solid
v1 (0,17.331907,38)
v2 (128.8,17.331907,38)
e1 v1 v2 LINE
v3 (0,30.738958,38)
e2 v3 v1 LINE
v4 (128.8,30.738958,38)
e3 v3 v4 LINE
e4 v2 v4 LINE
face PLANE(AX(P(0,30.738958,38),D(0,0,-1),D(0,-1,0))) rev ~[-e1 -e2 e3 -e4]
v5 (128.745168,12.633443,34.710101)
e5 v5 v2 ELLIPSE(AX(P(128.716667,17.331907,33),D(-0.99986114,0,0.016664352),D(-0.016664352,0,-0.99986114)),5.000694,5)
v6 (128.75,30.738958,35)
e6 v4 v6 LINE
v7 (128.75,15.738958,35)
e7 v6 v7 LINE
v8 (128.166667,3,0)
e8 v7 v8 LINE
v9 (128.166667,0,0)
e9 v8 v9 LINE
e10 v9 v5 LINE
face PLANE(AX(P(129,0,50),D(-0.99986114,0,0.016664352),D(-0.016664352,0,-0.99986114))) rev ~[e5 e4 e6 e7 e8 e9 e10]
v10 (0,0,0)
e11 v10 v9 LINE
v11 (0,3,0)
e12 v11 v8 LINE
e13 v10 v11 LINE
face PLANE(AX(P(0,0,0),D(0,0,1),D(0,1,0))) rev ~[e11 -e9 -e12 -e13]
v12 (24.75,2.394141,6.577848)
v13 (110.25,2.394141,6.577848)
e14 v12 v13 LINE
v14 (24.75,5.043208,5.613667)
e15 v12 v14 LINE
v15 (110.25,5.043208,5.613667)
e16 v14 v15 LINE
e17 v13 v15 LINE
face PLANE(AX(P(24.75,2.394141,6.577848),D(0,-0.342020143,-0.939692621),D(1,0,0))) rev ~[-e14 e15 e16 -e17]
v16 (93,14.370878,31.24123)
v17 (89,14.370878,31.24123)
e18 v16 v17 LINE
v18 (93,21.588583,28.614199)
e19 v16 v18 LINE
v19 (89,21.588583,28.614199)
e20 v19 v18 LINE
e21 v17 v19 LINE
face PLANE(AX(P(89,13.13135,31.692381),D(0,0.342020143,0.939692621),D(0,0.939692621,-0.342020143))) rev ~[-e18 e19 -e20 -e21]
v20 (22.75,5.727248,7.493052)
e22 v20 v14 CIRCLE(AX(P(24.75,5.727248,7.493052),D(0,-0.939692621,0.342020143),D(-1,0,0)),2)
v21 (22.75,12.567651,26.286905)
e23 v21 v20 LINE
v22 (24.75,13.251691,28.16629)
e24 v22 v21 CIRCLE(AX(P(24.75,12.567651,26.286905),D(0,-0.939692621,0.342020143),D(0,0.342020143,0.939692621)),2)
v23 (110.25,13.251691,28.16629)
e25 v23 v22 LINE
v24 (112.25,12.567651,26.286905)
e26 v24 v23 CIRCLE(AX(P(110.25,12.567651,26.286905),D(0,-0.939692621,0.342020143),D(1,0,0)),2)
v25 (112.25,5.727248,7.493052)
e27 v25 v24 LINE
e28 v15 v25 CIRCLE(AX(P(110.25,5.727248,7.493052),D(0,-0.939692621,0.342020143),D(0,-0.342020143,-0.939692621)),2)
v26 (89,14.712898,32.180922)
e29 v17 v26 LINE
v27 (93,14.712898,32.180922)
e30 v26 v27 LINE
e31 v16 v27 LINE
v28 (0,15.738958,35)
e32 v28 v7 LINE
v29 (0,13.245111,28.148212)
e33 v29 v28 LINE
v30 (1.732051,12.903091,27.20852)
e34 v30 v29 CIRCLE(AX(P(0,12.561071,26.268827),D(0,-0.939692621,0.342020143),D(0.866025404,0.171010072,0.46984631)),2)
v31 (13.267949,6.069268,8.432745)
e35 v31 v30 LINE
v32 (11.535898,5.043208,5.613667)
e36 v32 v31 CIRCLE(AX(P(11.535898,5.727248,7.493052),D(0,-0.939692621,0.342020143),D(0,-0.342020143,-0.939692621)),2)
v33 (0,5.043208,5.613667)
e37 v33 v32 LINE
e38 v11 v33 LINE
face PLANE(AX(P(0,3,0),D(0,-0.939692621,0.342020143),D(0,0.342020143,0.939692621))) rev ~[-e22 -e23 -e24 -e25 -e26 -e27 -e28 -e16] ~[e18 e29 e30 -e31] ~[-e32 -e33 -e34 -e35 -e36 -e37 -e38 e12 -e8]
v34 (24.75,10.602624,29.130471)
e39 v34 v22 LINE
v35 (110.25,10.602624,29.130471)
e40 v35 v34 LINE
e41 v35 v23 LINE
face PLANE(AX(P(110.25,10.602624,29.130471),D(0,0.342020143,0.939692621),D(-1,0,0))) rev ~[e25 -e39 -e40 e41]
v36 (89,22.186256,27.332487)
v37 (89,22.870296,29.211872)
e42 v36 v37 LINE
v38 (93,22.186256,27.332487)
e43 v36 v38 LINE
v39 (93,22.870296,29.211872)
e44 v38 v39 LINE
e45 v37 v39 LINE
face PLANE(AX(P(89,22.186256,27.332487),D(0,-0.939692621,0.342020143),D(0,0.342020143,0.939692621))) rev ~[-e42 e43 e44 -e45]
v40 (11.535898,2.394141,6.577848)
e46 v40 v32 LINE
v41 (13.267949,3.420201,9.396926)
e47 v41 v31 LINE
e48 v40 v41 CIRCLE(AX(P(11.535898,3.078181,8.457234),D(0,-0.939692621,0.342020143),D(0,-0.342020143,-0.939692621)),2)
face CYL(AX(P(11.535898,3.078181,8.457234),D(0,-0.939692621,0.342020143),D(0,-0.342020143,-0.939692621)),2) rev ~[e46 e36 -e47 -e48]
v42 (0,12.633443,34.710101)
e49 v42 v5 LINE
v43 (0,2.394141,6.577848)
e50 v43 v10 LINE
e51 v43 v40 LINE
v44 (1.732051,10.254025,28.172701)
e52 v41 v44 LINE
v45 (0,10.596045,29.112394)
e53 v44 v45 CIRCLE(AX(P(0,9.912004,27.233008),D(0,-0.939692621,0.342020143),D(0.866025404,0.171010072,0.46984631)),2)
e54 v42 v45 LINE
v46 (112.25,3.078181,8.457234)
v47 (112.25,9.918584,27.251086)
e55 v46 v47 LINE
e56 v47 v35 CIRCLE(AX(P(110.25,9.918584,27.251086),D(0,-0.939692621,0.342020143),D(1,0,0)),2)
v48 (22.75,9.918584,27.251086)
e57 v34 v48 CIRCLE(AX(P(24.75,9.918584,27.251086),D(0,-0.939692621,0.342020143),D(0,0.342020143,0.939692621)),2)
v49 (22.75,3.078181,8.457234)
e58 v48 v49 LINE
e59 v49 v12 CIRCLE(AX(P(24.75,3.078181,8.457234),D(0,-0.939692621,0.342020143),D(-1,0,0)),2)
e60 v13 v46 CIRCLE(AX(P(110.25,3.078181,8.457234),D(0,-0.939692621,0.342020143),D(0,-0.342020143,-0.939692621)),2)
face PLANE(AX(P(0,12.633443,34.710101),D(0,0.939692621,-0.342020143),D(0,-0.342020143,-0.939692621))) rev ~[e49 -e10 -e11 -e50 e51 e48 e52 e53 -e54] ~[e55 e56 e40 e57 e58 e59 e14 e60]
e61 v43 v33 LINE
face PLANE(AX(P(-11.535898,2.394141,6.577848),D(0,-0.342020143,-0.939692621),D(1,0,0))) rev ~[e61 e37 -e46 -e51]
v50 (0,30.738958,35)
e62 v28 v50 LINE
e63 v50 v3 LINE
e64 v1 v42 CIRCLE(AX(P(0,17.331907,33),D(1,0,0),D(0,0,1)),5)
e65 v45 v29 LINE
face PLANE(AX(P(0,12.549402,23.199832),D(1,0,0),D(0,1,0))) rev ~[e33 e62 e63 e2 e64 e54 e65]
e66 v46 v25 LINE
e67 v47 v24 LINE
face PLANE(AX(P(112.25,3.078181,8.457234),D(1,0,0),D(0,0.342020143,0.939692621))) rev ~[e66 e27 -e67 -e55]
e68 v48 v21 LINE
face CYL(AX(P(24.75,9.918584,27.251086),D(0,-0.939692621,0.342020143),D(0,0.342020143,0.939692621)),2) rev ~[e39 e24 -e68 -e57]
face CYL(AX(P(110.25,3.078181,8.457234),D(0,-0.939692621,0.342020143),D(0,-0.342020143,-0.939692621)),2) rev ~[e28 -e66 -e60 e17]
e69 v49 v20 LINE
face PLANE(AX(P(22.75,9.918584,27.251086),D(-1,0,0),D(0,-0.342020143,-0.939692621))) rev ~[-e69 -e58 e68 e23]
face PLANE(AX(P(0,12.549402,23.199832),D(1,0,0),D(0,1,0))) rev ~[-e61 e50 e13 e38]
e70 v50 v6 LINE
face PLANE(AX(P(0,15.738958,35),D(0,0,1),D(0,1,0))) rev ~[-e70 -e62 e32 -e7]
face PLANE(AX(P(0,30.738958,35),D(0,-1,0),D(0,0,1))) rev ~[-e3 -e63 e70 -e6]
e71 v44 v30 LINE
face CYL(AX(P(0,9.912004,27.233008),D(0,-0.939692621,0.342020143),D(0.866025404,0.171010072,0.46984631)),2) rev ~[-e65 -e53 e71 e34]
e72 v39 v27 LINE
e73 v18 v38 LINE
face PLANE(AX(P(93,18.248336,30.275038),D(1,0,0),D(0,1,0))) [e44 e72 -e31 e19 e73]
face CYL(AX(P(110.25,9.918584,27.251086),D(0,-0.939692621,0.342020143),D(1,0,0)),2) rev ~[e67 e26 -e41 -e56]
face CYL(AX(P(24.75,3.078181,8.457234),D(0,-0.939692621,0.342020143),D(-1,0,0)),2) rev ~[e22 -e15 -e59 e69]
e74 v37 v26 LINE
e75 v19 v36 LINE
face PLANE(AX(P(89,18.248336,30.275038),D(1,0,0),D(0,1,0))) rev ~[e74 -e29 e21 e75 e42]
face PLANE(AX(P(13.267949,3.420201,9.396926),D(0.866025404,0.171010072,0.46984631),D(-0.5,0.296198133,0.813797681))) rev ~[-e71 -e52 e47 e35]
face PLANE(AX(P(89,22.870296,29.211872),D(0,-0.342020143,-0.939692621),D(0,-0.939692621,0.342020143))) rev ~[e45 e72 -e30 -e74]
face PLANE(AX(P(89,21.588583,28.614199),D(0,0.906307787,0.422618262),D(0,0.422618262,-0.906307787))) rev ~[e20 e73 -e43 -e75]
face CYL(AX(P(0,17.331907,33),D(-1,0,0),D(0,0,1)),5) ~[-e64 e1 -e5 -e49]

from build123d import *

# Parameters (mm, degrees)
F1_DEPTH = 129
F3_DEPTH = 25
F5_DEPTH = 40
F8_DEPTH = 4


# Not quite as in the source:
# - a feature names something its author has since deleted; it is built from what else it names


with BuildPart() as f1:
    # F0 (on Right) → F1 (new body)
    with BuildSketch(Plane.YZ):
        with BuildLine():
            Line((12.6334434892, 34.7101007166), (0, 0))
            Line((0, 0), (3, 0))
            Line((3, 0), (15.7389581993, 35))
            Line((15.7389581993, 35), (30.7389581993, 35))
            Line((30.7389581993, 35), (30.7389581993, 38))
            Line((30.7389581993, 38), (17.3319065932, 38))
            ThreePointArc((17.3319065932, 38), (14.4640244114, 37.0957602214), (12.6334434892, 34.7101007166))
        make_face()
    extrude(amount=F1_DEPTH)

    # F2 (on face) → F3 (cut)
    with BuildSketch(Plane(origin=(0, 0, 0), x_dir=(1, 0, 0), z_dir=(0, -0.9396926208, 0.3420201433))):
        with BuildLine():
            Line((24.75, 7), (110.25, 7))
            ThreePointArc((110.25, 7), (111.6642135624, 7.5857864376), (112.25, 9))
            Line((112.25, 9), (112.25, 29))
            ThreePointArc((112.25, 29), (111.6642135624, 30.4142135624), (110.25, 31))
            Line((110.25, 31), (24.75, 31))
            ThreePointArc((24.75, 31), (23.3357864376, 30.4142135624), (22.75, 29))
            Line((22.75, 29), (22.75, 9))
            ThreePointArc((22.75, 9), (23.3357864376, 7.5857864376), (24.75, 7))
        make_face()
        with BuildLine():
            ThreePointArc((-13.2679491924, 10), (-13.2679491924, 8), (-11.5358983849, 7))
            Line((-11.5358983849, 7), (0, 7))
            Line((0, 7), (0, 30.9807621135))
            ThreePointArc((0, 30.9807621135), (-1, 30.7128129211), (-1.7320508076, 29.9807621135))
            Line((-1.7320508076, 29.9807621135), (-13.2679491924, 10))
        make_face()
        with BuildLine():
            Line((0, 30.9807621135), (0, 7))
            Line((0, 7), (11.5358983849, 7))
            ThreePointArc((11.5358983849, 7), (13.2679491924, 8), (13.2679491924, 10))
            Line((13.2679491924, 10), (1.7320508076, 29.9807621135))
            ThreePointArc((1.7320508076, 29.9807621135), (1, 30.7128129211), (0, 30.9807621135))
        make_face()
    extrude(amount=-F3_DEPTH, mode=Mode.SUBTRACT)

    # F4 (on Front) → F5 (cut)
    with BuildSketch(Plane.XZ):
        Polygon((149, 50), (129, 50), (128, -10), (149, -10), align=None)
    extrude(amount=-F5_DEPTH, mode=Mode.SUBTRACT)

    # F7 (on offset) → F8 (join)
    with BuildSketch(Plane.YZ.offset(89)):
        Polygon((22.8702962437, 29.2118719039), (13.4733700358, 32.6320733372), (13.1313498925, 31.6923807164), (21.5885834796, 28.6141994265), (22.186255957, 27.3324866624), align=None)
    extrude(amount=F8_DEPTH)


solid = f1.part
